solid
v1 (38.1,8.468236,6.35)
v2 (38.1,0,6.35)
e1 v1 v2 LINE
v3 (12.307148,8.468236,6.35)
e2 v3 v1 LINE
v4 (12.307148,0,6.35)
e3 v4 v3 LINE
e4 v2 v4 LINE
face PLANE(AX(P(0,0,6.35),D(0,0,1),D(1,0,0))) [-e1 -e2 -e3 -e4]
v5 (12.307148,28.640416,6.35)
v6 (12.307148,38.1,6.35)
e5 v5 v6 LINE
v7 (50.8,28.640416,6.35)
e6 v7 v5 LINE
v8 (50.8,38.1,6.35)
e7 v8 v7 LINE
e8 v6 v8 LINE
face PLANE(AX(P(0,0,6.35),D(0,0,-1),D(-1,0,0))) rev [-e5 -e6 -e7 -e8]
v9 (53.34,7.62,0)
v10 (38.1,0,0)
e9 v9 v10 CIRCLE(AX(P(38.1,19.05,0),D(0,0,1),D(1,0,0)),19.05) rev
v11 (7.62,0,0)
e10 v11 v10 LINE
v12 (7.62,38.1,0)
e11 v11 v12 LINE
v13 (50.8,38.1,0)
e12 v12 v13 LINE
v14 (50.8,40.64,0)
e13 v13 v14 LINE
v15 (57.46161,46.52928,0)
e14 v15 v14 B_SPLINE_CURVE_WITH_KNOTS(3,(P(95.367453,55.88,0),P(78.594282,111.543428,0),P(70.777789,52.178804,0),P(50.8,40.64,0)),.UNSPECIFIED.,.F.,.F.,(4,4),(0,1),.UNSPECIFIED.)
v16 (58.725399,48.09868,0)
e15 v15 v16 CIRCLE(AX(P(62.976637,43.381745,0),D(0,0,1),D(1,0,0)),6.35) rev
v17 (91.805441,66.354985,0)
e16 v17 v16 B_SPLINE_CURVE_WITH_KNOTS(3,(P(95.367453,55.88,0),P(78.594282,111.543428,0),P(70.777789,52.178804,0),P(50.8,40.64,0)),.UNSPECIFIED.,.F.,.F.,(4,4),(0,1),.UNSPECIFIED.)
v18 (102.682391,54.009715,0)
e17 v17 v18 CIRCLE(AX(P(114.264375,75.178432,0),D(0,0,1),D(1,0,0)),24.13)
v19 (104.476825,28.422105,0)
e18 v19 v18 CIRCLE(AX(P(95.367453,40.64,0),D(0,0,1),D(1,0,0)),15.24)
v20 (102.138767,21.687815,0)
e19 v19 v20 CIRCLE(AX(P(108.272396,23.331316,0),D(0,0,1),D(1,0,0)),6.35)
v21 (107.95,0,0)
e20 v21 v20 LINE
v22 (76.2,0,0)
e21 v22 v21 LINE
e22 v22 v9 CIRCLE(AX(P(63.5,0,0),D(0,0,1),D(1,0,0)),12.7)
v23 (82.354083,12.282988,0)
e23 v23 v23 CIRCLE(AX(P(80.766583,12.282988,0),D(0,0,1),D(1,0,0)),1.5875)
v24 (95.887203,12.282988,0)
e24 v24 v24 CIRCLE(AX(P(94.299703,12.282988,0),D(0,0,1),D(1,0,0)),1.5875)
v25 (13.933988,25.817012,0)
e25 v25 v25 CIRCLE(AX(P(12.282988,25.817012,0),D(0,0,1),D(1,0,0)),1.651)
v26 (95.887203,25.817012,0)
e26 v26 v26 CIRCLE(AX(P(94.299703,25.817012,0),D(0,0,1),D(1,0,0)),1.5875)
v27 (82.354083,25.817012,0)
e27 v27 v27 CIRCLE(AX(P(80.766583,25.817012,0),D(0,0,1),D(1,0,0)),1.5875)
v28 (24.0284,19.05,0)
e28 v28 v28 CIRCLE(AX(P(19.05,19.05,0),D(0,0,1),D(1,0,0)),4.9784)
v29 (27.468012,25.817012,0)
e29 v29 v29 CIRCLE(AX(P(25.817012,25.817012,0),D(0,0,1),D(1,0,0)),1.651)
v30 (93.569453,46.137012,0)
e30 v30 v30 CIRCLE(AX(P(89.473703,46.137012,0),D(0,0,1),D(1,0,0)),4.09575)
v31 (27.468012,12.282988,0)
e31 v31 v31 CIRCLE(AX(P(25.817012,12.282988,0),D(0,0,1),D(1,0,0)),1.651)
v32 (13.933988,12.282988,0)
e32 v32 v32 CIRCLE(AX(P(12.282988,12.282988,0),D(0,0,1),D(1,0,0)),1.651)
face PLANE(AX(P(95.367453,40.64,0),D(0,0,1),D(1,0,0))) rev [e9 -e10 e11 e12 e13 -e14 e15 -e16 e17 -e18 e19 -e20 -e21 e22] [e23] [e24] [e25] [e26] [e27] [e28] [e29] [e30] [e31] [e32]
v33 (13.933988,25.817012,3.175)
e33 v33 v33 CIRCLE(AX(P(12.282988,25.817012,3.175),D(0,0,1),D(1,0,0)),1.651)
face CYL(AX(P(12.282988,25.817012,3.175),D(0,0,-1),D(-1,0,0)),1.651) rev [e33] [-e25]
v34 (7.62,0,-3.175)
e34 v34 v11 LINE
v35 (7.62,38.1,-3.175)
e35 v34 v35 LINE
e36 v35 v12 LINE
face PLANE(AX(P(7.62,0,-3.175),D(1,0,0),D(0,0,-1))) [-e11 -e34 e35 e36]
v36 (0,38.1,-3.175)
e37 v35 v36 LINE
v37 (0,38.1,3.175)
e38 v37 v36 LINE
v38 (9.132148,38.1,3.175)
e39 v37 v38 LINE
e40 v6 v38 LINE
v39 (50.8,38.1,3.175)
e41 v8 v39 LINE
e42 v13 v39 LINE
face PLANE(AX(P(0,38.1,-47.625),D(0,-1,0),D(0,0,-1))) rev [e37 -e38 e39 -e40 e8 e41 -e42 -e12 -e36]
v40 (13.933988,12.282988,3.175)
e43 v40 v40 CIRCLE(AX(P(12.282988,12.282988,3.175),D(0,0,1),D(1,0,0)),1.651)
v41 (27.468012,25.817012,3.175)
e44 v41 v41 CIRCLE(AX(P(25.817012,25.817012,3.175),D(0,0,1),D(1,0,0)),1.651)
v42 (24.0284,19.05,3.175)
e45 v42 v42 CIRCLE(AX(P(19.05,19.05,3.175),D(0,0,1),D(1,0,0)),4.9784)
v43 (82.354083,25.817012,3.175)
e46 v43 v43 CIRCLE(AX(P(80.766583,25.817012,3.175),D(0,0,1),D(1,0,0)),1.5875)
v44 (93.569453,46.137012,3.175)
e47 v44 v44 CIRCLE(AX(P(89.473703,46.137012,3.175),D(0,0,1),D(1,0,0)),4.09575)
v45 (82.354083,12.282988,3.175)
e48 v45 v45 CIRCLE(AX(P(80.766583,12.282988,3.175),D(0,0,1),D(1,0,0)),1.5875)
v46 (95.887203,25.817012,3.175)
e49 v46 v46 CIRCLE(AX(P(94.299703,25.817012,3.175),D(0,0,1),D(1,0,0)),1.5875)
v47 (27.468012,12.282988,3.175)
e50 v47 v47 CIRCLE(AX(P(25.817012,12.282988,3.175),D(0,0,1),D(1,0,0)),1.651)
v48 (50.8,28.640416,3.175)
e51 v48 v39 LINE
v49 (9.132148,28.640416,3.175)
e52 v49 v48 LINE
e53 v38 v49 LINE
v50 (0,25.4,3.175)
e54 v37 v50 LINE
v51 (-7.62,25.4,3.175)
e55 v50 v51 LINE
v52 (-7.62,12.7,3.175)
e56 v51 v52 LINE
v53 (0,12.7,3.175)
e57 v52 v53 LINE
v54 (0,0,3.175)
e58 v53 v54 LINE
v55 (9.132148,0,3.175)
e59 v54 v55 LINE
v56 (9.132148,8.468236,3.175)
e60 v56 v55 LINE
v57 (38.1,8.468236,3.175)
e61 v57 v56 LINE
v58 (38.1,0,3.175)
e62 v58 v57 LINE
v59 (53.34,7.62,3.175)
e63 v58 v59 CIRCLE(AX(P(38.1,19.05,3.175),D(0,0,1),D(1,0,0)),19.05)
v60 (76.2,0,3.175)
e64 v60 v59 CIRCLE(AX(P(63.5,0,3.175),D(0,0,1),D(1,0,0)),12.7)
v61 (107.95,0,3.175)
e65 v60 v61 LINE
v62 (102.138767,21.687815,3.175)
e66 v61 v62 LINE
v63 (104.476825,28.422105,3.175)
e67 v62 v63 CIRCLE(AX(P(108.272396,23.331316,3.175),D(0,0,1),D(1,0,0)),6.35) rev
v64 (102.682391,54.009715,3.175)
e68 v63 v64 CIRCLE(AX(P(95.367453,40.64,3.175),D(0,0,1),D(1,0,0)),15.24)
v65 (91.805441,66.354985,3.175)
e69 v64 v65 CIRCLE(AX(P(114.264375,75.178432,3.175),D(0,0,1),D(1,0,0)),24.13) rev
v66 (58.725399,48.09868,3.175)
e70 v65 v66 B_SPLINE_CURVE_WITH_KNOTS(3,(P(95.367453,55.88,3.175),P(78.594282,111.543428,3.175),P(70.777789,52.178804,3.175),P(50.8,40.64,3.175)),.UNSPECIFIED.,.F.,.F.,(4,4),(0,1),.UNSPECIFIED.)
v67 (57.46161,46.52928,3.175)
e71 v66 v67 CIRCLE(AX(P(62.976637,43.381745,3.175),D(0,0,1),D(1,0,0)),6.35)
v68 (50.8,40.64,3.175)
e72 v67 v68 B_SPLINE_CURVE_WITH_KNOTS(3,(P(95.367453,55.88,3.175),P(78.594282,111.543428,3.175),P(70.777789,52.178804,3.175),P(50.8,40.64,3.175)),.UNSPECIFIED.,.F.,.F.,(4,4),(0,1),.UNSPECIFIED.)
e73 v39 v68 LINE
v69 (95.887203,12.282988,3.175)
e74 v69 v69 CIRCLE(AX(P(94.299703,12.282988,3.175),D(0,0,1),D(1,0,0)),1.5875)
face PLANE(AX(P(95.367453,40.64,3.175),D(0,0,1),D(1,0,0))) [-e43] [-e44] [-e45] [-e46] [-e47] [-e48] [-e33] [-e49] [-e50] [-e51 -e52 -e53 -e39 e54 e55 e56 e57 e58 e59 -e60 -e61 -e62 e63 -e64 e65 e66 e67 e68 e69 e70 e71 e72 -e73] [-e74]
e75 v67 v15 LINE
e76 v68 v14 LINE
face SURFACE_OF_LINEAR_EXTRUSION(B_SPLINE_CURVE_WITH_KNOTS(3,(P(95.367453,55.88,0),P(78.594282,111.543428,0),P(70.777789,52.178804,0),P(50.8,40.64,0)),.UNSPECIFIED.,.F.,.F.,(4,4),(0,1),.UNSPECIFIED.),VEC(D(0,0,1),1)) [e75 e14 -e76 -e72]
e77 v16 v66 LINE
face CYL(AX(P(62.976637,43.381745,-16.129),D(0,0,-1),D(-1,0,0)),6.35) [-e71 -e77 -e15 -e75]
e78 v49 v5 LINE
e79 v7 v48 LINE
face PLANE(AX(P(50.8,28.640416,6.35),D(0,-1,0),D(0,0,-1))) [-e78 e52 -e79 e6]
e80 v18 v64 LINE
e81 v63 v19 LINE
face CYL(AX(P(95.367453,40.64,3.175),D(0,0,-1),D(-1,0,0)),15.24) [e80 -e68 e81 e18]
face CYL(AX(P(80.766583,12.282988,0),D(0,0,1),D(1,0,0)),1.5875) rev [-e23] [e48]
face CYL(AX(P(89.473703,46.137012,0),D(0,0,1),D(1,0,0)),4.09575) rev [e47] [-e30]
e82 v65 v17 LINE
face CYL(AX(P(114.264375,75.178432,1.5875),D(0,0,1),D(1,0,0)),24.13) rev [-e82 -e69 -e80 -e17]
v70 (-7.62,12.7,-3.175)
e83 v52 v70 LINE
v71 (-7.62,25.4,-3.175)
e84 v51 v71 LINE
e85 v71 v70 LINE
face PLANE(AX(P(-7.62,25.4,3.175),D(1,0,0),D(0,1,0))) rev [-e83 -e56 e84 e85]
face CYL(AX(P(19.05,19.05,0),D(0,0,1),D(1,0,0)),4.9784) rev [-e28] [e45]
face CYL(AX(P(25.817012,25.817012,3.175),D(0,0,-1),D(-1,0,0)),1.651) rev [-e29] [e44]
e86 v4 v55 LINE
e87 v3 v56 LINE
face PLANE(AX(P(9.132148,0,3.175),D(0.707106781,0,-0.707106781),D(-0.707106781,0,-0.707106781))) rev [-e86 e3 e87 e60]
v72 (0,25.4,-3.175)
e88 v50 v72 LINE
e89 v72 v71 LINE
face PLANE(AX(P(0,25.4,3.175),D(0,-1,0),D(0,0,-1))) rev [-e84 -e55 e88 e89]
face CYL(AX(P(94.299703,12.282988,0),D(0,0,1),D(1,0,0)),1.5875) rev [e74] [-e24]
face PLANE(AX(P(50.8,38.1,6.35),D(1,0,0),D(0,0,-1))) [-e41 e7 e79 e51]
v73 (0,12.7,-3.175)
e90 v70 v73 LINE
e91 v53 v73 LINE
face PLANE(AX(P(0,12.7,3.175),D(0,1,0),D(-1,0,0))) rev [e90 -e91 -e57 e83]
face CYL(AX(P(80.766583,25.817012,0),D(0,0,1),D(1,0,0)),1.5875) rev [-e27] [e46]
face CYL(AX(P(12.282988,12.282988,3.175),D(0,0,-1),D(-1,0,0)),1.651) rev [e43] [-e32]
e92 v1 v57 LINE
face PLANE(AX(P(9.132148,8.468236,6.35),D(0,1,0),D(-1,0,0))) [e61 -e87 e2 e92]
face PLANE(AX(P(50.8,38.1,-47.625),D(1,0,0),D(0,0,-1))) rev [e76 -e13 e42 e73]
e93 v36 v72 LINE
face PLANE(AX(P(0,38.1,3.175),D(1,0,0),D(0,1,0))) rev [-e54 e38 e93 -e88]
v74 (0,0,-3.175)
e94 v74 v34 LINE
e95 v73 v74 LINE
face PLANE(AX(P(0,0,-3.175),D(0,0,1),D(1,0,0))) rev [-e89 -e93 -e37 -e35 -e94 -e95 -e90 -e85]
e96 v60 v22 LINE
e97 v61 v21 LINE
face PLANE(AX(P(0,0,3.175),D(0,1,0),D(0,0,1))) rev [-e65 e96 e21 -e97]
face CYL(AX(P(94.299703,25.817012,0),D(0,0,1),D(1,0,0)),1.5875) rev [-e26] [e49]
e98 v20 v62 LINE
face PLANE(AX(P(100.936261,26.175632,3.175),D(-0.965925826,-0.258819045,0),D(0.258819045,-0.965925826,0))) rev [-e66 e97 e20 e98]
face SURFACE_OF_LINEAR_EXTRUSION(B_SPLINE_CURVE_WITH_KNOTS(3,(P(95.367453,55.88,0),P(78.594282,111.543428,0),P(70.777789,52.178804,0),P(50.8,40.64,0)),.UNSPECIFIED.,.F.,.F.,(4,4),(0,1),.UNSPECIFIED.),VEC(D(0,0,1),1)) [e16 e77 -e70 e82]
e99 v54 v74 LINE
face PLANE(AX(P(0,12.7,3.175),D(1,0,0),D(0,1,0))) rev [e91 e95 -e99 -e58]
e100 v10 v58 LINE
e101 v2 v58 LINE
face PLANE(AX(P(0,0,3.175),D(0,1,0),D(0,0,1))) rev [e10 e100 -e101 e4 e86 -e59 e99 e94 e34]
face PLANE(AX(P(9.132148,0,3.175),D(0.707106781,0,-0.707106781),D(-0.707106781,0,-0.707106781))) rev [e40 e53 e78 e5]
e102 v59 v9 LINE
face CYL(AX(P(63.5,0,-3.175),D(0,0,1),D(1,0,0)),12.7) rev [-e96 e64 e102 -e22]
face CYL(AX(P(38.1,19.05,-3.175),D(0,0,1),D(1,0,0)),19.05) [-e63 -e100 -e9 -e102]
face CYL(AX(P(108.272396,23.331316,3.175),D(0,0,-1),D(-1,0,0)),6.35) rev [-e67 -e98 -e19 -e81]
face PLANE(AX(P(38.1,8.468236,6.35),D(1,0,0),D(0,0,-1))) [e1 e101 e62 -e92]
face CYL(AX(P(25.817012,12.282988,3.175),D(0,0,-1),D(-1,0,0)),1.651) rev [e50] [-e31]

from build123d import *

# Parameters (mm, degrees)
SKETCH1_R           = 1.651
BOSS_EXTRUDE1_DEPTH = 3.175
CUT_EXTRUDE2_DEPTH  = 6.35
SKETCH7_R           = 4.9784
SKETCH7_R_2         = 1.5875
CUT_EXTRUDE3_DEPTH  = 124.96234811
FILLET1_R           = 6.35
SKETCH8_W           = 50.8
SKETCH8_H           = 12.7
CUT_EXTRUDE4_DEPTH  = 50.8
CUT_EXTRUDE5_DEPTH  = 19.304
FILLET6_R           = 6.35
FILLET7_R           = 6.35
FILLET8_R           = 19.05
BOSS_EXTRUDE2_DEPTH = 3.175
FILLET9_R           = 24.13
SKETCH13_W          = 41.667851519
SKETCH13_H          = 9.459584315
SKETCH13_W_2        = 28.967851519
SKETCH13_H_2        = 8.468235606
BOSS_EXTRUDE3_DEPTH = 6.35
SKETCH16_R          = 4.09575
CUT_EXTRUDE8_DEPTH  = 137.155378763
BOSS_EXTRUDE4_DEPTH = 6.35
CUT_EXTRUDE9_DEPTH  = 119.214793194


with BuildPart() as part:
    # Sketch1 → Boss-Extrude1 (new body)
    with BuildSketch(Plane.XY):
        with BuildLine():
            Line((0, 0), (107.95, 0))
            Line((107.95, 0), (100.9362606, 26.175631792))
            Line((100.9362606, 26.175631792), (100.868755024, 26.427566033))
            ThreePointArc((100.868755024, 26.427566033), (110.348359368, 43.438223217), (95.367453293, 55.88))
            Line((95.367453293, 55.88), (0, 38.1))
            Line((0, 38.1), (0, 25.4))
            Line((0, 25.4), (-7.62, 25.4))
            Line((-7.62, 25.4), (-7.62, 12.7))
            Line((-7.62, 12.7), (0, 12.7))
            Line((0, 12.7), (0, 0))
        make_face()
        with Locations((25.817011896, 25.817011896)):
            Circle(SKETCH1_R, mode=Mode.SUBTRACT)
        with Locations((25.817011896, 12.282988104)):
            Circle(SKETCH1_R, mode=Mode.SUBTRACT)
        with Locations((12.282988104, 12.282988104)):
            Circle(SKETCH1_R, mode=Mode.SUBTRACT)
        with Locations((12.282988104, 25.817011896)):
            Circle(SKETCH1_R, mode=Mode.SUBTRACT)
    extrude(amount=BOSS_EXTRUDE1_DEPTH)

    # Sketch6 → Cut-Extrude2 (cut)
    with BuildSketch(Plane.XY.offset(3.175)):
        with BuildLine():
            Line((50.8, 0), (76.2, 0))
            ThreePointArc((76.2, 0), (63.5, 12.7), (50.8, 0))
        make_face()
    extrude(amount=-CUT_EXTRUDE2_DEPTH, mode=Mode.SUBTRACT)

    # Sketch7 → Cut-Extrude3 (cut, through all)
    with BuildSketch(Plane.XY.offset(3.175)):
        with Locations((19.05, 19.05)):
            Circle(SKETCH7_R)
        with Locations((80.766582748, 12.282988104)):
            Circle(SKETCH7_R_2)
        with Locations((94.299702748, 12.282988104)):
            Circle(SKETCH7_R_2)
        with Locations((80.766582748, 25.817011896)):
            Circle(SKETCH7_R_2)
        with Locations((94.299702748, 25.817011896)):
            Circle(SKETCH7_R_2)
    extrude(amount=-CUT_EXTRUDE3_DEPTH, mode=Mode.SUBTRACT)

    # Fillet1
    fillet1_edges = [part.edges().sort_by_distance(p)[0] for p in [
        (100.868755024, 26.427566033, 1.5875),
    ]]
    fillet(fillet1_edges, radius=FILLET1_R)

    # Sketch8 → Cut-Extrude4 (cut)
    with BuildSketch(Plane.XY.offset(3.175)):
        with Locations((25.4, 44.45)):
            Rectangle(SKETCH8_W, SKETCH8_H)
    extrude(amount=-CUT_EXTRUDE4_DEPTH, mode=Mode.SUBTRACT)

    # Sketch9 → Cut-Extrude5 (cut)
    with BuildSketch(Plane.XY.offset(3.175)):
        Polygon((50.8, 47.57098794), (50.8, 40.64), (57.15, 40.64), (57.15, 48.754861432), align=None)
    extrude(amount=-CUT_EXTRUDE5_DEPTH, mode=Mode.SUBTRACT)

    # Fillet6
    fillet6_edges = [part.edges().sort_by_distance(p)[0] for p in [
        (57.15, 40.64, 1.5875),
    ]]
    fillet(fillet6_edges, radius=FILLET6_R - 0.0001)  # a hair under: the kernel refuses the full size

    # Fillet7
    fillet7_edges = [part.edges().sort_by_distance(p)[0] for p in [
        (57.15, 48.754861432, 1.5875),
    ]]
    fillet(fillet7_edges, radius=FILLET7_R)

    # Fillet8
    fillet8_edges = [part.edges().sort_by_distance(p)[0] for p in [
        (50.8, 0, 1.5875),
    ]]
    fillet(fillet8_edges, radius=FILLET8_R)

    # Sketch12 → Boss-Extrude2 (add)
    with BuildSketch(Plane.XY.offset(3.175)):
        with BuildLine():
            Line((50.8, 40.64), (85.027112904, 40.64))
            Line((85.027112904, 40.64), (95.367453293, 55.88))
            add(Edge.make_bspline(
                [(50.8, 40.64), (70.777788932, 52.178803671), (78.594281742, 111.543427795), (95.367453293, 55.88)],
                knots=[0, 0, 0, 0, 1, 1, 1, 1], degree=3))
        make_face()
    extrude(amount=-BOSS_EXTRUDE2_DEPTH)

    # Fillet9
    fillet9_edges = [part.edges().sort_by_distance(p)[0] for p in [
        (95.367453293, 55.88, 1.5875),
    ]]
    fillet(fillet9_edges, radius=FILLET9_R)

    # Sketch13 → Boss-Extrude3 (add)
    with BuildSketch(Plane(origin=(0, 0, 0), x_dir=(-1, 0, 0), z_dir=(0, 0, -1))):
        with Locations((-29.966074241, 33.370207843)):
            Rectangle(SKETCH13_W, SKETCH13_H)
        with Locations((-23.616074241, 4.234117803)):
            Rectangle(SKETCH13_W_2, SKETCH13_H_2)
    extrude(amount=-BOSS_EXTRUDE3_DEPTH)

    # Sketch16 → Cut-Extrude8 (cut, through all)
    with BuildSketch(Plane.XY.offset(3.175)):
        with Locations((89.473702748, 46.137011896)):
            Circle(SKETCH16_R)
    extrude(amount=-CUT_EXTRUDE8_DEPTH, mode=Mode.SUBTRACT)

    # Sketch18 → Boss-Extrude4 (add)
    with BuildSketch(Plane.XY.offset(3.175)):
        Polygon((0, 0), (7.62, 0), (7.62, 38.1), (0, 38.1), (0, 25.4), (-7.62, 25.4), (-7.62, 12.7), (0, 12.7), align=None)
    extrude(amount=-BOSS_EXTRUDE4_DEPTH)

    # Sketch19 → Cut-Extrude9 (cut, through all)
    with BuildSketch(Plane(origin=(0, 38.1, 0), x_dir=(1, 0, 0), z_dir=(0, 1, 0))):
        Polygon((9.132148481, -3.175), (12.307148481, -6.35), (9.132148481, -6.35), align=None)
    extrude(amount=-CUT_EXTRUDE9_DEPTH, mode=Mode.SUBTRACT)


solid = part.part
